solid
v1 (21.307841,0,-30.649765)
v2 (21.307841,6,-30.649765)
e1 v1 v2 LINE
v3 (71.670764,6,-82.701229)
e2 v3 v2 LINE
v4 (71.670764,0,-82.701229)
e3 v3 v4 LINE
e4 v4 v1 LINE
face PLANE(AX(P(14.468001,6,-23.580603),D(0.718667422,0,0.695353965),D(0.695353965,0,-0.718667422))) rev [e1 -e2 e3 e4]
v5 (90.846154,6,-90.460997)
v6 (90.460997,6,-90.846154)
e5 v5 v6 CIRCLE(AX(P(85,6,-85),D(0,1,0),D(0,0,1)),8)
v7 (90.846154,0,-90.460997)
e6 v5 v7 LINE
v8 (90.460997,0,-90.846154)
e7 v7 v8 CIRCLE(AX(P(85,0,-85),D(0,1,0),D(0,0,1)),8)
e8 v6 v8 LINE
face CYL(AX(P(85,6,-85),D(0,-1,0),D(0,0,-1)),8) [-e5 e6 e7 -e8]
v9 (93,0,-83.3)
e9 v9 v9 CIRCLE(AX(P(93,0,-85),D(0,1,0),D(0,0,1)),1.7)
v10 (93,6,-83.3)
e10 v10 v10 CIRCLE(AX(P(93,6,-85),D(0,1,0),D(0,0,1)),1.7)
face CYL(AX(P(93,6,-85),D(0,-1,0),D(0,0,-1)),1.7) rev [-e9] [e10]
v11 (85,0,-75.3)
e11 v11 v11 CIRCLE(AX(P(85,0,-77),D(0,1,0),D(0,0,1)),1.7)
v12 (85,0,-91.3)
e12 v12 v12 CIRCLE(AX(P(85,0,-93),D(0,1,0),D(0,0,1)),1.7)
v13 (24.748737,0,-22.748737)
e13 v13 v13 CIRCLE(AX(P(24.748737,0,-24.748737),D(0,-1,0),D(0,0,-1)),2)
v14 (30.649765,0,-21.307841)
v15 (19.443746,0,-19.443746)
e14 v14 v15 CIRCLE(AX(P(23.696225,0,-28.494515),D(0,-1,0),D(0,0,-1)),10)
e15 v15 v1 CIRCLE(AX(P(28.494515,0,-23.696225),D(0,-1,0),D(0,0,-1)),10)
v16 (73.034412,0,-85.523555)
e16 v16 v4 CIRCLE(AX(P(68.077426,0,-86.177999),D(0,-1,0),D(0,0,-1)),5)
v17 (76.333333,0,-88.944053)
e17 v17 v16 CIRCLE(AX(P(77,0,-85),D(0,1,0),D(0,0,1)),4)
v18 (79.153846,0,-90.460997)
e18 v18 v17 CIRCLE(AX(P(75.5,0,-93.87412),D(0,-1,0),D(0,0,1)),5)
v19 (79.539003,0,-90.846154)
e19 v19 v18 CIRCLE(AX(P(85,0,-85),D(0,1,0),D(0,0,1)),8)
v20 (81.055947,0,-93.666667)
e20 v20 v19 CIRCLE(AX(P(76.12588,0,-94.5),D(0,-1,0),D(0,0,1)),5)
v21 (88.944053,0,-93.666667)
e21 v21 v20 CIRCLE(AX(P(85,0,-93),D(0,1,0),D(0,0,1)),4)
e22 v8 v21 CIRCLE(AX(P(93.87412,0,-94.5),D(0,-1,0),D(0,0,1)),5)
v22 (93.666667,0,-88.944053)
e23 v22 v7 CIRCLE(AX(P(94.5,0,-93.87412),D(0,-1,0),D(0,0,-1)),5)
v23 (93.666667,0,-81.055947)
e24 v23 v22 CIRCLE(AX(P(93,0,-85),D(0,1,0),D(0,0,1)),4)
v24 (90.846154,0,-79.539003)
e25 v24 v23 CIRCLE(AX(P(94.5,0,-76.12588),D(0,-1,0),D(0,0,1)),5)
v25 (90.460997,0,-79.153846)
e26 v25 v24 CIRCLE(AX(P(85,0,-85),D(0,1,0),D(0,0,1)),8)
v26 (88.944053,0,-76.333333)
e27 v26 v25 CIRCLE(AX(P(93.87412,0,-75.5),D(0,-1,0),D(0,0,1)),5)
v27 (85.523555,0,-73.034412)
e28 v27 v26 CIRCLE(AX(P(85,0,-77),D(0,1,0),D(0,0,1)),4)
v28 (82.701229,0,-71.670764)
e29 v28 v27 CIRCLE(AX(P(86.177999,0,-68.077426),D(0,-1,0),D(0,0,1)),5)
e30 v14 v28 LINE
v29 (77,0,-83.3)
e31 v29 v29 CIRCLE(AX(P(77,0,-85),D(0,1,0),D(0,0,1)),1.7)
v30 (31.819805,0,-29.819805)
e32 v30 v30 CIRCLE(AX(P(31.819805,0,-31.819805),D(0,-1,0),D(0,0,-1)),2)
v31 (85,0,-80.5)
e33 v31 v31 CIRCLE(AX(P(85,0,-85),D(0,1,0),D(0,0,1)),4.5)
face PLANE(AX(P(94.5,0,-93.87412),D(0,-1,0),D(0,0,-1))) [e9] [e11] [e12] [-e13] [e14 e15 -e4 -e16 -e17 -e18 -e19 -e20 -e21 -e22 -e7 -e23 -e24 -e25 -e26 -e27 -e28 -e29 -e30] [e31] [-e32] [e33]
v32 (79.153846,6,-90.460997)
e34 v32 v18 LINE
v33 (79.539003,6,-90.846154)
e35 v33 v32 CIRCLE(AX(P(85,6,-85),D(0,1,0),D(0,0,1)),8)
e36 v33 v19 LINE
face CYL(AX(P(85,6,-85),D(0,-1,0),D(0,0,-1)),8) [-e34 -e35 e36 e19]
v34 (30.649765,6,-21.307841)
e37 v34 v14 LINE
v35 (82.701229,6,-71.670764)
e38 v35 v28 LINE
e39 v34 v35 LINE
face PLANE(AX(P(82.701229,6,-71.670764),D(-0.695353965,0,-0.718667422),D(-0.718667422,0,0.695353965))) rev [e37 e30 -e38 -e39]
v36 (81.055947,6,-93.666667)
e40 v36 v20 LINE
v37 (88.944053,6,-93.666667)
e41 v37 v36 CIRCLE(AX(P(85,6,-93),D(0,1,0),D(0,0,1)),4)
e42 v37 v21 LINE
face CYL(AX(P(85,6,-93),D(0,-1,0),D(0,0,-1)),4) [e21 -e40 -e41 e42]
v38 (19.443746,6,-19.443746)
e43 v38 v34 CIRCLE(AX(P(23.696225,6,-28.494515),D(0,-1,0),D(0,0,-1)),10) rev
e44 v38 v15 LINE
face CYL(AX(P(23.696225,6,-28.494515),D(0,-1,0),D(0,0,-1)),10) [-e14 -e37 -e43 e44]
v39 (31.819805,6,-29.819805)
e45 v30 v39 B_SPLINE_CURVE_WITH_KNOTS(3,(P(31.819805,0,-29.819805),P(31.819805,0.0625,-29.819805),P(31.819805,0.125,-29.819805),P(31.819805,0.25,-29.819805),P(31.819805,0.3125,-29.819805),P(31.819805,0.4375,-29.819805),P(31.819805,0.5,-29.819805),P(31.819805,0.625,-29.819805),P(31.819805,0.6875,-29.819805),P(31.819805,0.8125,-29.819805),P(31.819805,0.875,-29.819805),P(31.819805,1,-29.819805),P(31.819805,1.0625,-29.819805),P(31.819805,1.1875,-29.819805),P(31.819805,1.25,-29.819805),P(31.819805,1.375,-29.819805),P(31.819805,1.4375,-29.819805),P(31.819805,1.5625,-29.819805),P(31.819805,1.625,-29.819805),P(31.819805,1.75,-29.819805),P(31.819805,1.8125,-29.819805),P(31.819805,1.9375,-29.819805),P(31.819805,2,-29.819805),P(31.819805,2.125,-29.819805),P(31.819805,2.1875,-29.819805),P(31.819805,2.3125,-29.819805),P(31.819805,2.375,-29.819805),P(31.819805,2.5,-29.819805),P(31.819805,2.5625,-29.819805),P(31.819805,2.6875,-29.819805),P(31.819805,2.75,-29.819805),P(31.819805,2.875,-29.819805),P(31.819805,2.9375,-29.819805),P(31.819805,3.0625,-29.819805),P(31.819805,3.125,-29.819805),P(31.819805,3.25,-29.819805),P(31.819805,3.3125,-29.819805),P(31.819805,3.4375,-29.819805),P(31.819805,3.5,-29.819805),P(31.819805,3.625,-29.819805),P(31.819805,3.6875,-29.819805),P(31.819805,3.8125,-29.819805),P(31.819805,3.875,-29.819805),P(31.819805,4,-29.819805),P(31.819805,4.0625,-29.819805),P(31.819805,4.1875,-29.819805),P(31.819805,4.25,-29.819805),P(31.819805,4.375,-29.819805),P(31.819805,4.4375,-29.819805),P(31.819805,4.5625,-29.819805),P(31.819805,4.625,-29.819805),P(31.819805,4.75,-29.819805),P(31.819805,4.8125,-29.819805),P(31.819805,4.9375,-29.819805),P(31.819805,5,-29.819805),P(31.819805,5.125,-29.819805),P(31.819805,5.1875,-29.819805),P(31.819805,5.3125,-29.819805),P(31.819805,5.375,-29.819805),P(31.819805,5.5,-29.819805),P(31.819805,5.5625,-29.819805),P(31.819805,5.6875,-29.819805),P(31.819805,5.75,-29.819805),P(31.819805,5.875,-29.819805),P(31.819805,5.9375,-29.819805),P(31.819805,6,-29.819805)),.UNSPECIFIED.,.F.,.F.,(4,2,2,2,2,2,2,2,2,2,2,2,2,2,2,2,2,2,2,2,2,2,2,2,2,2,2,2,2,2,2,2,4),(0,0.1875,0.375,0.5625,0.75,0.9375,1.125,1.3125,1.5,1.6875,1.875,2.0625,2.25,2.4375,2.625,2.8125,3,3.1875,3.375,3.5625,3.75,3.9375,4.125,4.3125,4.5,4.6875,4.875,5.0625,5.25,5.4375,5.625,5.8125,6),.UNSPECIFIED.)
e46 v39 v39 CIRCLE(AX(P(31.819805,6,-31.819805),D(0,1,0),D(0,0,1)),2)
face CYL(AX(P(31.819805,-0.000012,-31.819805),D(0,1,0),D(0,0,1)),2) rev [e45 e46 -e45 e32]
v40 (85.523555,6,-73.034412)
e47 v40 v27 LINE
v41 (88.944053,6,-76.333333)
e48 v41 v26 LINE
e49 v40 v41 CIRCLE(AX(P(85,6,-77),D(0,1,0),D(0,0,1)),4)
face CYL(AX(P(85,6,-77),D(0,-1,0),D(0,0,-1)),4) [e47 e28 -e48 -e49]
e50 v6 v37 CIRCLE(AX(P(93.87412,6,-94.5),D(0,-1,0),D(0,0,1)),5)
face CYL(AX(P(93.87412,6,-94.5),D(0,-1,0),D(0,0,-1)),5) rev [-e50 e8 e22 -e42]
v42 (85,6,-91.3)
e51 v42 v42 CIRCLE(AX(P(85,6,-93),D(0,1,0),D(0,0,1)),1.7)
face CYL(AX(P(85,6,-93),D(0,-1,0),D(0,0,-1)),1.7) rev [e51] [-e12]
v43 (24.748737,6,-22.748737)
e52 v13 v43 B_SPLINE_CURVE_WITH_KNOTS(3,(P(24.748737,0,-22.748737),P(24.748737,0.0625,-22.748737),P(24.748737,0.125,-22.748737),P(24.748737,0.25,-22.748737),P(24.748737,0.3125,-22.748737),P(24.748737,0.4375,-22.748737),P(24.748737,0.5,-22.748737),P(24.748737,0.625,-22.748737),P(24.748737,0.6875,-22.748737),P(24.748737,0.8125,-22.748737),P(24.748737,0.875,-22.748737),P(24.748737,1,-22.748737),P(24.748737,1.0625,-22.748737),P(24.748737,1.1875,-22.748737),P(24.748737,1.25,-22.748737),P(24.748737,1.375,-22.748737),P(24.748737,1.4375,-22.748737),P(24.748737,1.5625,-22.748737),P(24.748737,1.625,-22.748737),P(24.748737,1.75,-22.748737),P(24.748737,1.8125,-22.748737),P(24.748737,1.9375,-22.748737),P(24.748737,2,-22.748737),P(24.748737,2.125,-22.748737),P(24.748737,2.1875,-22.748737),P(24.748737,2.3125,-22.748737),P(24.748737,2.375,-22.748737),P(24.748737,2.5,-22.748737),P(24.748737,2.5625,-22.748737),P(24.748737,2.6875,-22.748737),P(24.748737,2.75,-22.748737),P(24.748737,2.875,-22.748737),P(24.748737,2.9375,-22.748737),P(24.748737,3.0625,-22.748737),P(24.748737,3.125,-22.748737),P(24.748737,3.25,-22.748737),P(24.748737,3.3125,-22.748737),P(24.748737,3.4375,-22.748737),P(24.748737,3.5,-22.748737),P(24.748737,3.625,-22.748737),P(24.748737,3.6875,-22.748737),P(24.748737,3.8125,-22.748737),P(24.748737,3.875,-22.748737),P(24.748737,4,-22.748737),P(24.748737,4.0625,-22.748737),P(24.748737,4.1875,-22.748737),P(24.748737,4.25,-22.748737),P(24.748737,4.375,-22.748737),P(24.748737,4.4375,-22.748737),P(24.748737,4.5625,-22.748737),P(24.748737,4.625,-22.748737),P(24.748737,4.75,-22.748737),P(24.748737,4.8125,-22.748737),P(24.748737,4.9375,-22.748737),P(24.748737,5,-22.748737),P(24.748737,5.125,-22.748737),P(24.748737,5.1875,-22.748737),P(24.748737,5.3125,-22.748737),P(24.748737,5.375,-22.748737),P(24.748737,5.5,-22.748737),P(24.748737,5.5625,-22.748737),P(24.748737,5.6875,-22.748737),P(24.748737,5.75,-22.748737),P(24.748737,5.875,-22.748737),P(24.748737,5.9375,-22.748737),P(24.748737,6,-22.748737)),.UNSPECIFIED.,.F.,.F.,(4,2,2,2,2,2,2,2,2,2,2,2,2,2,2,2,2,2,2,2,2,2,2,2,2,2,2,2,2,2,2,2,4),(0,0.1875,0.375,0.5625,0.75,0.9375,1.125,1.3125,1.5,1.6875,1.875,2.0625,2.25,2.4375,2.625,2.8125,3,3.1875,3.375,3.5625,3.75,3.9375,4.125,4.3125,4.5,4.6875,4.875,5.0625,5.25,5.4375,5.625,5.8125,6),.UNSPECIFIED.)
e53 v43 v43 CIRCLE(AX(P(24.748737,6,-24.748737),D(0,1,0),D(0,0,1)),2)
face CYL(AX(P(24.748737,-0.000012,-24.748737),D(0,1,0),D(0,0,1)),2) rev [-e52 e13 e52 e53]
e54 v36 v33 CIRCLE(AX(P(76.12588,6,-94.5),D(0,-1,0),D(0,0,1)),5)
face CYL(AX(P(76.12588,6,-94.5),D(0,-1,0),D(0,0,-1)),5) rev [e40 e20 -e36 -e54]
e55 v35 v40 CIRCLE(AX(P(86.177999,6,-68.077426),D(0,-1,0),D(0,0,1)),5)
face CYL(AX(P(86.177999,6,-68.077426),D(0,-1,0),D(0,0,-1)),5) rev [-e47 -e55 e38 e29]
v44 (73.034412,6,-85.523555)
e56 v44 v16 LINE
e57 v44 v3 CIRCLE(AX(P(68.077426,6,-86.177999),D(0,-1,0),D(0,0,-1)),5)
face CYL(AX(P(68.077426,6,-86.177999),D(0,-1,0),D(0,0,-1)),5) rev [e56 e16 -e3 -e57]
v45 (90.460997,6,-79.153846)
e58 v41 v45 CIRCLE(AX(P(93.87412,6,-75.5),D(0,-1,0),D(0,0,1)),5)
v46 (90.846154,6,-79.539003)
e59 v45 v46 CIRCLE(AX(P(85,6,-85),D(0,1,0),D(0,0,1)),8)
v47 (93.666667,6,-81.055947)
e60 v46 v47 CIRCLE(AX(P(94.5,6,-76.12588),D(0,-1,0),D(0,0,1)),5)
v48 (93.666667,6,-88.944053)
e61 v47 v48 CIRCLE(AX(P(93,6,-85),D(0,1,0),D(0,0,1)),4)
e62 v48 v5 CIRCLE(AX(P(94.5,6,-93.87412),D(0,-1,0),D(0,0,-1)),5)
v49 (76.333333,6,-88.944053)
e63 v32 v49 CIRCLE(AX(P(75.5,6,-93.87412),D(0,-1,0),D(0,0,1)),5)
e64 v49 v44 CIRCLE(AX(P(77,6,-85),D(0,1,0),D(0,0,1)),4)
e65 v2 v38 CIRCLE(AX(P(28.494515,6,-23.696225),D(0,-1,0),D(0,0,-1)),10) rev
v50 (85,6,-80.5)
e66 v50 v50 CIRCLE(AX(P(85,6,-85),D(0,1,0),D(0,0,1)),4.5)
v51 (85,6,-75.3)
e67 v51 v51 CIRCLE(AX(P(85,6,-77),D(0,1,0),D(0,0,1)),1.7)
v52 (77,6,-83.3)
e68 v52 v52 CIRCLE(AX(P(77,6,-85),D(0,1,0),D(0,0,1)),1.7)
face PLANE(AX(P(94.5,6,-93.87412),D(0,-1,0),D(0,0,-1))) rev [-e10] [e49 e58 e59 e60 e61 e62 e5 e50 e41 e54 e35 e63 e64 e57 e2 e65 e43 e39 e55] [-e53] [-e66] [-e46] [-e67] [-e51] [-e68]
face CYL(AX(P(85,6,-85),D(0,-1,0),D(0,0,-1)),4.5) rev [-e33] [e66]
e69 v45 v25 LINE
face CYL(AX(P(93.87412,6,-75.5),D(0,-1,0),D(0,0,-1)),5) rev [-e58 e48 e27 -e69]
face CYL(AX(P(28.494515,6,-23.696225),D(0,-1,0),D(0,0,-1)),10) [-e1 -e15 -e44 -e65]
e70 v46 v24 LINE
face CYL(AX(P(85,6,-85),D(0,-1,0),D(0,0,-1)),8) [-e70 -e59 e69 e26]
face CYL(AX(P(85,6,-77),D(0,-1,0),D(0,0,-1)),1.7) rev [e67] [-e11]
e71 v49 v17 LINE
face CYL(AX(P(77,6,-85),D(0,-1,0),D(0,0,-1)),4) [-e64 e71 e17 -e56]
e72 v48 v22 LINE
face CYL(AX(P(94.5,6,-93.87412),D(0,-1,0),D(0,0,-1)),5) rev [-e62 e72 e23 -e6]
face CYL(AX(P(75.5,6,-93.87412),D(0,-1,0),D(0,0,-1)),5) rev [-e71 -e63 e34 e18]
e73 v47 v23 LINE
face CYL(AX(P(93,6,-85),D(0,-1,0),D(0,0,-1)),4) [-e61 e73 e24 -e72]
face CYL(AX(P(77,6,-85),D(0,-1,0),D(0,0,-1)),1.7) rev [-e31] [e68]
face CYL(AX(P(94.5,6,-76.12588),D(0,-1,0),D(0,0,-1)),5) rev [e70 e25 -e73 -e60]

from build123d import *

# Parameters (mm, degrees)
SKETCH2_R               = 1.7
SKETCH2_R_2             = 4.5
BOSS_EXTRUDE1_DEPTH     = 6
FILLET1_R               = 10
CUT_EXTRUDE2_DEPTH      = 138.309868546
CUT_EXTRUDE2_DEPTH_BACK = 138.309868546
SKETCH7_R               = 2


with BuildPart() as part:
    # Sketch2 → Boss-Extrude1 (new body)
    with BuildSketch(Plane(origin=(0, 0, 0), x_dir=(1, 0, 0), z_dir=(0, 1, 0))):
        with BuildLine():
            Line((82.701229094, 71.670763572), (23.580603164, 14.468001358))
            Line((23.580603164, 14.468001358), (14.468001358, 23.580603164))
            Line((14.468001358, 23.580603164), (71.670763572, 82.701229094))
            ThreePointArc((71.670763572, 82.701229094), (72.579468699, 84.002771186), (73.034411761, 85.523555075))
            ThreePointArc((73.034411761, 85.523555075), (74.120868496, 87.776797037), (76.333333333, 88.944053189))
            ThreePointArc((76.333333333, 88.944053189), (77.868327334, 89.470595445), (79.153846154, 90.460996723))
            ThreePointArc((79.153846154, 90.460996723), (79.343145751, 90.656854249), (79.539003277, 90.846153846))
            ThreePointArc((79.539003277, 90.846153846), (80.529404555, 92.131672666), (81.055946811, 93.666666667))
            ThreePointArc((81.055946811, 93.666666667), (85, 97), (88.944053189, 93.666666667))
            ThreePointArc((88.944053189, 93.666666667), (89.470595445, 92.131672666), (90.460996723, 90.846153846))
            ThreePointArc((90.460996723, 90.846153846), (90.656854249, 90.656854249), (90.846153846, 90.460996723))
            ThreePointArc((90.846153846, 90.460996723), (92.131672666, 89.470595445), (93.666666667, 88.944053189))
            ThreePointArc((93.666666667, 88.944053189), (97, 85), (93.666666667, 81.055946811))
            ThreePointArc((93.666666667, 81.055946811), (92.131672666, 80.529404555), (90.846153846, 79.539003277))
            ThreePointArc((90.846153846, 79.539003277), (90.656854249, 79.343145751), (90.460996723, 79.153846154))
            ThreePointArc((90.460996723, 79.153846154), (89.470595445, 77.868327334), (88.944053189, 76.333333333))
            ThreePointArc((88.944053189, 76.333333333), (87.776797037, 74.120868496), (85.523555075, 73.034411761))
            ThreePointArc((85.523555075, 73.034411761), (84.002771186, 72.579468699), (82.701229094, 71.670763572))
        make_face()
        with Locations(Location((85, 93, 0), (0, 0, 270))):
            Circle(SKETCH2_R, mode=Mode.SUBTRACT)
        with Locations(Location((93, 85, 0), (0, 0, 270))):
            Circle(SKETCH2_R, mode=Mode.SUBTRACT)
        with Locations(Location((85, 77, 0), (0, 0, 270))):
            Circle(SKETCH2_R, mode=Mode.SUBTRACT)
        with Locations(Location((77, 85, 0), (0, 0, 270))):
            Circle(SKETCH2_R, mode=Mode.SUBTRACT)
        with Locations(Location((85, 85, 0), (0, 0, 270))):
            Circle(SKETCH2_R_2, mode=Mode.SUBTRACT)
    extrude(amount=BOSS_EXTRUDE1_DEPTH)

    # Fillet1
    # the kernel refuses this fillet: 10 mm, written as the material it takes off along each edge
    with BuildSketch(Plane(origin=(23.580603164, -24.591214075, -14.468001358), x_dir=(0.71866742198992, 0, -0.6953539649490483), z_dir=(0, 1, 0)), Plane(origin=(14.468001358, -24.591214075, -23.580603164), x_dir=(0.7071067811865477, 0, 0.7071067811865475), z_dir=(0, 1, 0))) as fillet1_piece_1:
        with BuildLine():
            CenterArc((FILLET1_R * 0.983648563013, FILLET1_R), FILLET1_R, 180.944569645, 89.055430355)
            Line((-FILLET1_R * 0.0162155484343, FILLET1_R * 0.983514896433), (0, 0))
            Line((0, 0), (FILLET1_R * 0.983648563013, 0))
        make_face()
    extrude(amount=55.182428151, mode=Mode.SUBTRACT)

    # Sketch7 → Cut-Extrude2 (cut, two sides: drawn at the far end of the back side and taken through both)
    with BuildSketch(Plane(origin=(0, 0, 0), x_dir=(1, 0, 0), z_dir=(0, 1, 0)).offset(-CUT_EXTRUDE2_DEPTH_BACK)):
        with Locations(Location((24.748737342, 24.748737342, 0), (0, 0, 270))):
            Circle(SKETCH7_R)
        with Locations(Location((31.819805153, 31.819805153, 0), (0, 0, 270))):
            Circle(SKETCH7_R)
    extrude(amount=CUT_EXTRUDE2_DEPTH + CUT_EXTRUDE2_DEPTH_BACK, mode=Mode.SUBTRACT)


solid = part.part
